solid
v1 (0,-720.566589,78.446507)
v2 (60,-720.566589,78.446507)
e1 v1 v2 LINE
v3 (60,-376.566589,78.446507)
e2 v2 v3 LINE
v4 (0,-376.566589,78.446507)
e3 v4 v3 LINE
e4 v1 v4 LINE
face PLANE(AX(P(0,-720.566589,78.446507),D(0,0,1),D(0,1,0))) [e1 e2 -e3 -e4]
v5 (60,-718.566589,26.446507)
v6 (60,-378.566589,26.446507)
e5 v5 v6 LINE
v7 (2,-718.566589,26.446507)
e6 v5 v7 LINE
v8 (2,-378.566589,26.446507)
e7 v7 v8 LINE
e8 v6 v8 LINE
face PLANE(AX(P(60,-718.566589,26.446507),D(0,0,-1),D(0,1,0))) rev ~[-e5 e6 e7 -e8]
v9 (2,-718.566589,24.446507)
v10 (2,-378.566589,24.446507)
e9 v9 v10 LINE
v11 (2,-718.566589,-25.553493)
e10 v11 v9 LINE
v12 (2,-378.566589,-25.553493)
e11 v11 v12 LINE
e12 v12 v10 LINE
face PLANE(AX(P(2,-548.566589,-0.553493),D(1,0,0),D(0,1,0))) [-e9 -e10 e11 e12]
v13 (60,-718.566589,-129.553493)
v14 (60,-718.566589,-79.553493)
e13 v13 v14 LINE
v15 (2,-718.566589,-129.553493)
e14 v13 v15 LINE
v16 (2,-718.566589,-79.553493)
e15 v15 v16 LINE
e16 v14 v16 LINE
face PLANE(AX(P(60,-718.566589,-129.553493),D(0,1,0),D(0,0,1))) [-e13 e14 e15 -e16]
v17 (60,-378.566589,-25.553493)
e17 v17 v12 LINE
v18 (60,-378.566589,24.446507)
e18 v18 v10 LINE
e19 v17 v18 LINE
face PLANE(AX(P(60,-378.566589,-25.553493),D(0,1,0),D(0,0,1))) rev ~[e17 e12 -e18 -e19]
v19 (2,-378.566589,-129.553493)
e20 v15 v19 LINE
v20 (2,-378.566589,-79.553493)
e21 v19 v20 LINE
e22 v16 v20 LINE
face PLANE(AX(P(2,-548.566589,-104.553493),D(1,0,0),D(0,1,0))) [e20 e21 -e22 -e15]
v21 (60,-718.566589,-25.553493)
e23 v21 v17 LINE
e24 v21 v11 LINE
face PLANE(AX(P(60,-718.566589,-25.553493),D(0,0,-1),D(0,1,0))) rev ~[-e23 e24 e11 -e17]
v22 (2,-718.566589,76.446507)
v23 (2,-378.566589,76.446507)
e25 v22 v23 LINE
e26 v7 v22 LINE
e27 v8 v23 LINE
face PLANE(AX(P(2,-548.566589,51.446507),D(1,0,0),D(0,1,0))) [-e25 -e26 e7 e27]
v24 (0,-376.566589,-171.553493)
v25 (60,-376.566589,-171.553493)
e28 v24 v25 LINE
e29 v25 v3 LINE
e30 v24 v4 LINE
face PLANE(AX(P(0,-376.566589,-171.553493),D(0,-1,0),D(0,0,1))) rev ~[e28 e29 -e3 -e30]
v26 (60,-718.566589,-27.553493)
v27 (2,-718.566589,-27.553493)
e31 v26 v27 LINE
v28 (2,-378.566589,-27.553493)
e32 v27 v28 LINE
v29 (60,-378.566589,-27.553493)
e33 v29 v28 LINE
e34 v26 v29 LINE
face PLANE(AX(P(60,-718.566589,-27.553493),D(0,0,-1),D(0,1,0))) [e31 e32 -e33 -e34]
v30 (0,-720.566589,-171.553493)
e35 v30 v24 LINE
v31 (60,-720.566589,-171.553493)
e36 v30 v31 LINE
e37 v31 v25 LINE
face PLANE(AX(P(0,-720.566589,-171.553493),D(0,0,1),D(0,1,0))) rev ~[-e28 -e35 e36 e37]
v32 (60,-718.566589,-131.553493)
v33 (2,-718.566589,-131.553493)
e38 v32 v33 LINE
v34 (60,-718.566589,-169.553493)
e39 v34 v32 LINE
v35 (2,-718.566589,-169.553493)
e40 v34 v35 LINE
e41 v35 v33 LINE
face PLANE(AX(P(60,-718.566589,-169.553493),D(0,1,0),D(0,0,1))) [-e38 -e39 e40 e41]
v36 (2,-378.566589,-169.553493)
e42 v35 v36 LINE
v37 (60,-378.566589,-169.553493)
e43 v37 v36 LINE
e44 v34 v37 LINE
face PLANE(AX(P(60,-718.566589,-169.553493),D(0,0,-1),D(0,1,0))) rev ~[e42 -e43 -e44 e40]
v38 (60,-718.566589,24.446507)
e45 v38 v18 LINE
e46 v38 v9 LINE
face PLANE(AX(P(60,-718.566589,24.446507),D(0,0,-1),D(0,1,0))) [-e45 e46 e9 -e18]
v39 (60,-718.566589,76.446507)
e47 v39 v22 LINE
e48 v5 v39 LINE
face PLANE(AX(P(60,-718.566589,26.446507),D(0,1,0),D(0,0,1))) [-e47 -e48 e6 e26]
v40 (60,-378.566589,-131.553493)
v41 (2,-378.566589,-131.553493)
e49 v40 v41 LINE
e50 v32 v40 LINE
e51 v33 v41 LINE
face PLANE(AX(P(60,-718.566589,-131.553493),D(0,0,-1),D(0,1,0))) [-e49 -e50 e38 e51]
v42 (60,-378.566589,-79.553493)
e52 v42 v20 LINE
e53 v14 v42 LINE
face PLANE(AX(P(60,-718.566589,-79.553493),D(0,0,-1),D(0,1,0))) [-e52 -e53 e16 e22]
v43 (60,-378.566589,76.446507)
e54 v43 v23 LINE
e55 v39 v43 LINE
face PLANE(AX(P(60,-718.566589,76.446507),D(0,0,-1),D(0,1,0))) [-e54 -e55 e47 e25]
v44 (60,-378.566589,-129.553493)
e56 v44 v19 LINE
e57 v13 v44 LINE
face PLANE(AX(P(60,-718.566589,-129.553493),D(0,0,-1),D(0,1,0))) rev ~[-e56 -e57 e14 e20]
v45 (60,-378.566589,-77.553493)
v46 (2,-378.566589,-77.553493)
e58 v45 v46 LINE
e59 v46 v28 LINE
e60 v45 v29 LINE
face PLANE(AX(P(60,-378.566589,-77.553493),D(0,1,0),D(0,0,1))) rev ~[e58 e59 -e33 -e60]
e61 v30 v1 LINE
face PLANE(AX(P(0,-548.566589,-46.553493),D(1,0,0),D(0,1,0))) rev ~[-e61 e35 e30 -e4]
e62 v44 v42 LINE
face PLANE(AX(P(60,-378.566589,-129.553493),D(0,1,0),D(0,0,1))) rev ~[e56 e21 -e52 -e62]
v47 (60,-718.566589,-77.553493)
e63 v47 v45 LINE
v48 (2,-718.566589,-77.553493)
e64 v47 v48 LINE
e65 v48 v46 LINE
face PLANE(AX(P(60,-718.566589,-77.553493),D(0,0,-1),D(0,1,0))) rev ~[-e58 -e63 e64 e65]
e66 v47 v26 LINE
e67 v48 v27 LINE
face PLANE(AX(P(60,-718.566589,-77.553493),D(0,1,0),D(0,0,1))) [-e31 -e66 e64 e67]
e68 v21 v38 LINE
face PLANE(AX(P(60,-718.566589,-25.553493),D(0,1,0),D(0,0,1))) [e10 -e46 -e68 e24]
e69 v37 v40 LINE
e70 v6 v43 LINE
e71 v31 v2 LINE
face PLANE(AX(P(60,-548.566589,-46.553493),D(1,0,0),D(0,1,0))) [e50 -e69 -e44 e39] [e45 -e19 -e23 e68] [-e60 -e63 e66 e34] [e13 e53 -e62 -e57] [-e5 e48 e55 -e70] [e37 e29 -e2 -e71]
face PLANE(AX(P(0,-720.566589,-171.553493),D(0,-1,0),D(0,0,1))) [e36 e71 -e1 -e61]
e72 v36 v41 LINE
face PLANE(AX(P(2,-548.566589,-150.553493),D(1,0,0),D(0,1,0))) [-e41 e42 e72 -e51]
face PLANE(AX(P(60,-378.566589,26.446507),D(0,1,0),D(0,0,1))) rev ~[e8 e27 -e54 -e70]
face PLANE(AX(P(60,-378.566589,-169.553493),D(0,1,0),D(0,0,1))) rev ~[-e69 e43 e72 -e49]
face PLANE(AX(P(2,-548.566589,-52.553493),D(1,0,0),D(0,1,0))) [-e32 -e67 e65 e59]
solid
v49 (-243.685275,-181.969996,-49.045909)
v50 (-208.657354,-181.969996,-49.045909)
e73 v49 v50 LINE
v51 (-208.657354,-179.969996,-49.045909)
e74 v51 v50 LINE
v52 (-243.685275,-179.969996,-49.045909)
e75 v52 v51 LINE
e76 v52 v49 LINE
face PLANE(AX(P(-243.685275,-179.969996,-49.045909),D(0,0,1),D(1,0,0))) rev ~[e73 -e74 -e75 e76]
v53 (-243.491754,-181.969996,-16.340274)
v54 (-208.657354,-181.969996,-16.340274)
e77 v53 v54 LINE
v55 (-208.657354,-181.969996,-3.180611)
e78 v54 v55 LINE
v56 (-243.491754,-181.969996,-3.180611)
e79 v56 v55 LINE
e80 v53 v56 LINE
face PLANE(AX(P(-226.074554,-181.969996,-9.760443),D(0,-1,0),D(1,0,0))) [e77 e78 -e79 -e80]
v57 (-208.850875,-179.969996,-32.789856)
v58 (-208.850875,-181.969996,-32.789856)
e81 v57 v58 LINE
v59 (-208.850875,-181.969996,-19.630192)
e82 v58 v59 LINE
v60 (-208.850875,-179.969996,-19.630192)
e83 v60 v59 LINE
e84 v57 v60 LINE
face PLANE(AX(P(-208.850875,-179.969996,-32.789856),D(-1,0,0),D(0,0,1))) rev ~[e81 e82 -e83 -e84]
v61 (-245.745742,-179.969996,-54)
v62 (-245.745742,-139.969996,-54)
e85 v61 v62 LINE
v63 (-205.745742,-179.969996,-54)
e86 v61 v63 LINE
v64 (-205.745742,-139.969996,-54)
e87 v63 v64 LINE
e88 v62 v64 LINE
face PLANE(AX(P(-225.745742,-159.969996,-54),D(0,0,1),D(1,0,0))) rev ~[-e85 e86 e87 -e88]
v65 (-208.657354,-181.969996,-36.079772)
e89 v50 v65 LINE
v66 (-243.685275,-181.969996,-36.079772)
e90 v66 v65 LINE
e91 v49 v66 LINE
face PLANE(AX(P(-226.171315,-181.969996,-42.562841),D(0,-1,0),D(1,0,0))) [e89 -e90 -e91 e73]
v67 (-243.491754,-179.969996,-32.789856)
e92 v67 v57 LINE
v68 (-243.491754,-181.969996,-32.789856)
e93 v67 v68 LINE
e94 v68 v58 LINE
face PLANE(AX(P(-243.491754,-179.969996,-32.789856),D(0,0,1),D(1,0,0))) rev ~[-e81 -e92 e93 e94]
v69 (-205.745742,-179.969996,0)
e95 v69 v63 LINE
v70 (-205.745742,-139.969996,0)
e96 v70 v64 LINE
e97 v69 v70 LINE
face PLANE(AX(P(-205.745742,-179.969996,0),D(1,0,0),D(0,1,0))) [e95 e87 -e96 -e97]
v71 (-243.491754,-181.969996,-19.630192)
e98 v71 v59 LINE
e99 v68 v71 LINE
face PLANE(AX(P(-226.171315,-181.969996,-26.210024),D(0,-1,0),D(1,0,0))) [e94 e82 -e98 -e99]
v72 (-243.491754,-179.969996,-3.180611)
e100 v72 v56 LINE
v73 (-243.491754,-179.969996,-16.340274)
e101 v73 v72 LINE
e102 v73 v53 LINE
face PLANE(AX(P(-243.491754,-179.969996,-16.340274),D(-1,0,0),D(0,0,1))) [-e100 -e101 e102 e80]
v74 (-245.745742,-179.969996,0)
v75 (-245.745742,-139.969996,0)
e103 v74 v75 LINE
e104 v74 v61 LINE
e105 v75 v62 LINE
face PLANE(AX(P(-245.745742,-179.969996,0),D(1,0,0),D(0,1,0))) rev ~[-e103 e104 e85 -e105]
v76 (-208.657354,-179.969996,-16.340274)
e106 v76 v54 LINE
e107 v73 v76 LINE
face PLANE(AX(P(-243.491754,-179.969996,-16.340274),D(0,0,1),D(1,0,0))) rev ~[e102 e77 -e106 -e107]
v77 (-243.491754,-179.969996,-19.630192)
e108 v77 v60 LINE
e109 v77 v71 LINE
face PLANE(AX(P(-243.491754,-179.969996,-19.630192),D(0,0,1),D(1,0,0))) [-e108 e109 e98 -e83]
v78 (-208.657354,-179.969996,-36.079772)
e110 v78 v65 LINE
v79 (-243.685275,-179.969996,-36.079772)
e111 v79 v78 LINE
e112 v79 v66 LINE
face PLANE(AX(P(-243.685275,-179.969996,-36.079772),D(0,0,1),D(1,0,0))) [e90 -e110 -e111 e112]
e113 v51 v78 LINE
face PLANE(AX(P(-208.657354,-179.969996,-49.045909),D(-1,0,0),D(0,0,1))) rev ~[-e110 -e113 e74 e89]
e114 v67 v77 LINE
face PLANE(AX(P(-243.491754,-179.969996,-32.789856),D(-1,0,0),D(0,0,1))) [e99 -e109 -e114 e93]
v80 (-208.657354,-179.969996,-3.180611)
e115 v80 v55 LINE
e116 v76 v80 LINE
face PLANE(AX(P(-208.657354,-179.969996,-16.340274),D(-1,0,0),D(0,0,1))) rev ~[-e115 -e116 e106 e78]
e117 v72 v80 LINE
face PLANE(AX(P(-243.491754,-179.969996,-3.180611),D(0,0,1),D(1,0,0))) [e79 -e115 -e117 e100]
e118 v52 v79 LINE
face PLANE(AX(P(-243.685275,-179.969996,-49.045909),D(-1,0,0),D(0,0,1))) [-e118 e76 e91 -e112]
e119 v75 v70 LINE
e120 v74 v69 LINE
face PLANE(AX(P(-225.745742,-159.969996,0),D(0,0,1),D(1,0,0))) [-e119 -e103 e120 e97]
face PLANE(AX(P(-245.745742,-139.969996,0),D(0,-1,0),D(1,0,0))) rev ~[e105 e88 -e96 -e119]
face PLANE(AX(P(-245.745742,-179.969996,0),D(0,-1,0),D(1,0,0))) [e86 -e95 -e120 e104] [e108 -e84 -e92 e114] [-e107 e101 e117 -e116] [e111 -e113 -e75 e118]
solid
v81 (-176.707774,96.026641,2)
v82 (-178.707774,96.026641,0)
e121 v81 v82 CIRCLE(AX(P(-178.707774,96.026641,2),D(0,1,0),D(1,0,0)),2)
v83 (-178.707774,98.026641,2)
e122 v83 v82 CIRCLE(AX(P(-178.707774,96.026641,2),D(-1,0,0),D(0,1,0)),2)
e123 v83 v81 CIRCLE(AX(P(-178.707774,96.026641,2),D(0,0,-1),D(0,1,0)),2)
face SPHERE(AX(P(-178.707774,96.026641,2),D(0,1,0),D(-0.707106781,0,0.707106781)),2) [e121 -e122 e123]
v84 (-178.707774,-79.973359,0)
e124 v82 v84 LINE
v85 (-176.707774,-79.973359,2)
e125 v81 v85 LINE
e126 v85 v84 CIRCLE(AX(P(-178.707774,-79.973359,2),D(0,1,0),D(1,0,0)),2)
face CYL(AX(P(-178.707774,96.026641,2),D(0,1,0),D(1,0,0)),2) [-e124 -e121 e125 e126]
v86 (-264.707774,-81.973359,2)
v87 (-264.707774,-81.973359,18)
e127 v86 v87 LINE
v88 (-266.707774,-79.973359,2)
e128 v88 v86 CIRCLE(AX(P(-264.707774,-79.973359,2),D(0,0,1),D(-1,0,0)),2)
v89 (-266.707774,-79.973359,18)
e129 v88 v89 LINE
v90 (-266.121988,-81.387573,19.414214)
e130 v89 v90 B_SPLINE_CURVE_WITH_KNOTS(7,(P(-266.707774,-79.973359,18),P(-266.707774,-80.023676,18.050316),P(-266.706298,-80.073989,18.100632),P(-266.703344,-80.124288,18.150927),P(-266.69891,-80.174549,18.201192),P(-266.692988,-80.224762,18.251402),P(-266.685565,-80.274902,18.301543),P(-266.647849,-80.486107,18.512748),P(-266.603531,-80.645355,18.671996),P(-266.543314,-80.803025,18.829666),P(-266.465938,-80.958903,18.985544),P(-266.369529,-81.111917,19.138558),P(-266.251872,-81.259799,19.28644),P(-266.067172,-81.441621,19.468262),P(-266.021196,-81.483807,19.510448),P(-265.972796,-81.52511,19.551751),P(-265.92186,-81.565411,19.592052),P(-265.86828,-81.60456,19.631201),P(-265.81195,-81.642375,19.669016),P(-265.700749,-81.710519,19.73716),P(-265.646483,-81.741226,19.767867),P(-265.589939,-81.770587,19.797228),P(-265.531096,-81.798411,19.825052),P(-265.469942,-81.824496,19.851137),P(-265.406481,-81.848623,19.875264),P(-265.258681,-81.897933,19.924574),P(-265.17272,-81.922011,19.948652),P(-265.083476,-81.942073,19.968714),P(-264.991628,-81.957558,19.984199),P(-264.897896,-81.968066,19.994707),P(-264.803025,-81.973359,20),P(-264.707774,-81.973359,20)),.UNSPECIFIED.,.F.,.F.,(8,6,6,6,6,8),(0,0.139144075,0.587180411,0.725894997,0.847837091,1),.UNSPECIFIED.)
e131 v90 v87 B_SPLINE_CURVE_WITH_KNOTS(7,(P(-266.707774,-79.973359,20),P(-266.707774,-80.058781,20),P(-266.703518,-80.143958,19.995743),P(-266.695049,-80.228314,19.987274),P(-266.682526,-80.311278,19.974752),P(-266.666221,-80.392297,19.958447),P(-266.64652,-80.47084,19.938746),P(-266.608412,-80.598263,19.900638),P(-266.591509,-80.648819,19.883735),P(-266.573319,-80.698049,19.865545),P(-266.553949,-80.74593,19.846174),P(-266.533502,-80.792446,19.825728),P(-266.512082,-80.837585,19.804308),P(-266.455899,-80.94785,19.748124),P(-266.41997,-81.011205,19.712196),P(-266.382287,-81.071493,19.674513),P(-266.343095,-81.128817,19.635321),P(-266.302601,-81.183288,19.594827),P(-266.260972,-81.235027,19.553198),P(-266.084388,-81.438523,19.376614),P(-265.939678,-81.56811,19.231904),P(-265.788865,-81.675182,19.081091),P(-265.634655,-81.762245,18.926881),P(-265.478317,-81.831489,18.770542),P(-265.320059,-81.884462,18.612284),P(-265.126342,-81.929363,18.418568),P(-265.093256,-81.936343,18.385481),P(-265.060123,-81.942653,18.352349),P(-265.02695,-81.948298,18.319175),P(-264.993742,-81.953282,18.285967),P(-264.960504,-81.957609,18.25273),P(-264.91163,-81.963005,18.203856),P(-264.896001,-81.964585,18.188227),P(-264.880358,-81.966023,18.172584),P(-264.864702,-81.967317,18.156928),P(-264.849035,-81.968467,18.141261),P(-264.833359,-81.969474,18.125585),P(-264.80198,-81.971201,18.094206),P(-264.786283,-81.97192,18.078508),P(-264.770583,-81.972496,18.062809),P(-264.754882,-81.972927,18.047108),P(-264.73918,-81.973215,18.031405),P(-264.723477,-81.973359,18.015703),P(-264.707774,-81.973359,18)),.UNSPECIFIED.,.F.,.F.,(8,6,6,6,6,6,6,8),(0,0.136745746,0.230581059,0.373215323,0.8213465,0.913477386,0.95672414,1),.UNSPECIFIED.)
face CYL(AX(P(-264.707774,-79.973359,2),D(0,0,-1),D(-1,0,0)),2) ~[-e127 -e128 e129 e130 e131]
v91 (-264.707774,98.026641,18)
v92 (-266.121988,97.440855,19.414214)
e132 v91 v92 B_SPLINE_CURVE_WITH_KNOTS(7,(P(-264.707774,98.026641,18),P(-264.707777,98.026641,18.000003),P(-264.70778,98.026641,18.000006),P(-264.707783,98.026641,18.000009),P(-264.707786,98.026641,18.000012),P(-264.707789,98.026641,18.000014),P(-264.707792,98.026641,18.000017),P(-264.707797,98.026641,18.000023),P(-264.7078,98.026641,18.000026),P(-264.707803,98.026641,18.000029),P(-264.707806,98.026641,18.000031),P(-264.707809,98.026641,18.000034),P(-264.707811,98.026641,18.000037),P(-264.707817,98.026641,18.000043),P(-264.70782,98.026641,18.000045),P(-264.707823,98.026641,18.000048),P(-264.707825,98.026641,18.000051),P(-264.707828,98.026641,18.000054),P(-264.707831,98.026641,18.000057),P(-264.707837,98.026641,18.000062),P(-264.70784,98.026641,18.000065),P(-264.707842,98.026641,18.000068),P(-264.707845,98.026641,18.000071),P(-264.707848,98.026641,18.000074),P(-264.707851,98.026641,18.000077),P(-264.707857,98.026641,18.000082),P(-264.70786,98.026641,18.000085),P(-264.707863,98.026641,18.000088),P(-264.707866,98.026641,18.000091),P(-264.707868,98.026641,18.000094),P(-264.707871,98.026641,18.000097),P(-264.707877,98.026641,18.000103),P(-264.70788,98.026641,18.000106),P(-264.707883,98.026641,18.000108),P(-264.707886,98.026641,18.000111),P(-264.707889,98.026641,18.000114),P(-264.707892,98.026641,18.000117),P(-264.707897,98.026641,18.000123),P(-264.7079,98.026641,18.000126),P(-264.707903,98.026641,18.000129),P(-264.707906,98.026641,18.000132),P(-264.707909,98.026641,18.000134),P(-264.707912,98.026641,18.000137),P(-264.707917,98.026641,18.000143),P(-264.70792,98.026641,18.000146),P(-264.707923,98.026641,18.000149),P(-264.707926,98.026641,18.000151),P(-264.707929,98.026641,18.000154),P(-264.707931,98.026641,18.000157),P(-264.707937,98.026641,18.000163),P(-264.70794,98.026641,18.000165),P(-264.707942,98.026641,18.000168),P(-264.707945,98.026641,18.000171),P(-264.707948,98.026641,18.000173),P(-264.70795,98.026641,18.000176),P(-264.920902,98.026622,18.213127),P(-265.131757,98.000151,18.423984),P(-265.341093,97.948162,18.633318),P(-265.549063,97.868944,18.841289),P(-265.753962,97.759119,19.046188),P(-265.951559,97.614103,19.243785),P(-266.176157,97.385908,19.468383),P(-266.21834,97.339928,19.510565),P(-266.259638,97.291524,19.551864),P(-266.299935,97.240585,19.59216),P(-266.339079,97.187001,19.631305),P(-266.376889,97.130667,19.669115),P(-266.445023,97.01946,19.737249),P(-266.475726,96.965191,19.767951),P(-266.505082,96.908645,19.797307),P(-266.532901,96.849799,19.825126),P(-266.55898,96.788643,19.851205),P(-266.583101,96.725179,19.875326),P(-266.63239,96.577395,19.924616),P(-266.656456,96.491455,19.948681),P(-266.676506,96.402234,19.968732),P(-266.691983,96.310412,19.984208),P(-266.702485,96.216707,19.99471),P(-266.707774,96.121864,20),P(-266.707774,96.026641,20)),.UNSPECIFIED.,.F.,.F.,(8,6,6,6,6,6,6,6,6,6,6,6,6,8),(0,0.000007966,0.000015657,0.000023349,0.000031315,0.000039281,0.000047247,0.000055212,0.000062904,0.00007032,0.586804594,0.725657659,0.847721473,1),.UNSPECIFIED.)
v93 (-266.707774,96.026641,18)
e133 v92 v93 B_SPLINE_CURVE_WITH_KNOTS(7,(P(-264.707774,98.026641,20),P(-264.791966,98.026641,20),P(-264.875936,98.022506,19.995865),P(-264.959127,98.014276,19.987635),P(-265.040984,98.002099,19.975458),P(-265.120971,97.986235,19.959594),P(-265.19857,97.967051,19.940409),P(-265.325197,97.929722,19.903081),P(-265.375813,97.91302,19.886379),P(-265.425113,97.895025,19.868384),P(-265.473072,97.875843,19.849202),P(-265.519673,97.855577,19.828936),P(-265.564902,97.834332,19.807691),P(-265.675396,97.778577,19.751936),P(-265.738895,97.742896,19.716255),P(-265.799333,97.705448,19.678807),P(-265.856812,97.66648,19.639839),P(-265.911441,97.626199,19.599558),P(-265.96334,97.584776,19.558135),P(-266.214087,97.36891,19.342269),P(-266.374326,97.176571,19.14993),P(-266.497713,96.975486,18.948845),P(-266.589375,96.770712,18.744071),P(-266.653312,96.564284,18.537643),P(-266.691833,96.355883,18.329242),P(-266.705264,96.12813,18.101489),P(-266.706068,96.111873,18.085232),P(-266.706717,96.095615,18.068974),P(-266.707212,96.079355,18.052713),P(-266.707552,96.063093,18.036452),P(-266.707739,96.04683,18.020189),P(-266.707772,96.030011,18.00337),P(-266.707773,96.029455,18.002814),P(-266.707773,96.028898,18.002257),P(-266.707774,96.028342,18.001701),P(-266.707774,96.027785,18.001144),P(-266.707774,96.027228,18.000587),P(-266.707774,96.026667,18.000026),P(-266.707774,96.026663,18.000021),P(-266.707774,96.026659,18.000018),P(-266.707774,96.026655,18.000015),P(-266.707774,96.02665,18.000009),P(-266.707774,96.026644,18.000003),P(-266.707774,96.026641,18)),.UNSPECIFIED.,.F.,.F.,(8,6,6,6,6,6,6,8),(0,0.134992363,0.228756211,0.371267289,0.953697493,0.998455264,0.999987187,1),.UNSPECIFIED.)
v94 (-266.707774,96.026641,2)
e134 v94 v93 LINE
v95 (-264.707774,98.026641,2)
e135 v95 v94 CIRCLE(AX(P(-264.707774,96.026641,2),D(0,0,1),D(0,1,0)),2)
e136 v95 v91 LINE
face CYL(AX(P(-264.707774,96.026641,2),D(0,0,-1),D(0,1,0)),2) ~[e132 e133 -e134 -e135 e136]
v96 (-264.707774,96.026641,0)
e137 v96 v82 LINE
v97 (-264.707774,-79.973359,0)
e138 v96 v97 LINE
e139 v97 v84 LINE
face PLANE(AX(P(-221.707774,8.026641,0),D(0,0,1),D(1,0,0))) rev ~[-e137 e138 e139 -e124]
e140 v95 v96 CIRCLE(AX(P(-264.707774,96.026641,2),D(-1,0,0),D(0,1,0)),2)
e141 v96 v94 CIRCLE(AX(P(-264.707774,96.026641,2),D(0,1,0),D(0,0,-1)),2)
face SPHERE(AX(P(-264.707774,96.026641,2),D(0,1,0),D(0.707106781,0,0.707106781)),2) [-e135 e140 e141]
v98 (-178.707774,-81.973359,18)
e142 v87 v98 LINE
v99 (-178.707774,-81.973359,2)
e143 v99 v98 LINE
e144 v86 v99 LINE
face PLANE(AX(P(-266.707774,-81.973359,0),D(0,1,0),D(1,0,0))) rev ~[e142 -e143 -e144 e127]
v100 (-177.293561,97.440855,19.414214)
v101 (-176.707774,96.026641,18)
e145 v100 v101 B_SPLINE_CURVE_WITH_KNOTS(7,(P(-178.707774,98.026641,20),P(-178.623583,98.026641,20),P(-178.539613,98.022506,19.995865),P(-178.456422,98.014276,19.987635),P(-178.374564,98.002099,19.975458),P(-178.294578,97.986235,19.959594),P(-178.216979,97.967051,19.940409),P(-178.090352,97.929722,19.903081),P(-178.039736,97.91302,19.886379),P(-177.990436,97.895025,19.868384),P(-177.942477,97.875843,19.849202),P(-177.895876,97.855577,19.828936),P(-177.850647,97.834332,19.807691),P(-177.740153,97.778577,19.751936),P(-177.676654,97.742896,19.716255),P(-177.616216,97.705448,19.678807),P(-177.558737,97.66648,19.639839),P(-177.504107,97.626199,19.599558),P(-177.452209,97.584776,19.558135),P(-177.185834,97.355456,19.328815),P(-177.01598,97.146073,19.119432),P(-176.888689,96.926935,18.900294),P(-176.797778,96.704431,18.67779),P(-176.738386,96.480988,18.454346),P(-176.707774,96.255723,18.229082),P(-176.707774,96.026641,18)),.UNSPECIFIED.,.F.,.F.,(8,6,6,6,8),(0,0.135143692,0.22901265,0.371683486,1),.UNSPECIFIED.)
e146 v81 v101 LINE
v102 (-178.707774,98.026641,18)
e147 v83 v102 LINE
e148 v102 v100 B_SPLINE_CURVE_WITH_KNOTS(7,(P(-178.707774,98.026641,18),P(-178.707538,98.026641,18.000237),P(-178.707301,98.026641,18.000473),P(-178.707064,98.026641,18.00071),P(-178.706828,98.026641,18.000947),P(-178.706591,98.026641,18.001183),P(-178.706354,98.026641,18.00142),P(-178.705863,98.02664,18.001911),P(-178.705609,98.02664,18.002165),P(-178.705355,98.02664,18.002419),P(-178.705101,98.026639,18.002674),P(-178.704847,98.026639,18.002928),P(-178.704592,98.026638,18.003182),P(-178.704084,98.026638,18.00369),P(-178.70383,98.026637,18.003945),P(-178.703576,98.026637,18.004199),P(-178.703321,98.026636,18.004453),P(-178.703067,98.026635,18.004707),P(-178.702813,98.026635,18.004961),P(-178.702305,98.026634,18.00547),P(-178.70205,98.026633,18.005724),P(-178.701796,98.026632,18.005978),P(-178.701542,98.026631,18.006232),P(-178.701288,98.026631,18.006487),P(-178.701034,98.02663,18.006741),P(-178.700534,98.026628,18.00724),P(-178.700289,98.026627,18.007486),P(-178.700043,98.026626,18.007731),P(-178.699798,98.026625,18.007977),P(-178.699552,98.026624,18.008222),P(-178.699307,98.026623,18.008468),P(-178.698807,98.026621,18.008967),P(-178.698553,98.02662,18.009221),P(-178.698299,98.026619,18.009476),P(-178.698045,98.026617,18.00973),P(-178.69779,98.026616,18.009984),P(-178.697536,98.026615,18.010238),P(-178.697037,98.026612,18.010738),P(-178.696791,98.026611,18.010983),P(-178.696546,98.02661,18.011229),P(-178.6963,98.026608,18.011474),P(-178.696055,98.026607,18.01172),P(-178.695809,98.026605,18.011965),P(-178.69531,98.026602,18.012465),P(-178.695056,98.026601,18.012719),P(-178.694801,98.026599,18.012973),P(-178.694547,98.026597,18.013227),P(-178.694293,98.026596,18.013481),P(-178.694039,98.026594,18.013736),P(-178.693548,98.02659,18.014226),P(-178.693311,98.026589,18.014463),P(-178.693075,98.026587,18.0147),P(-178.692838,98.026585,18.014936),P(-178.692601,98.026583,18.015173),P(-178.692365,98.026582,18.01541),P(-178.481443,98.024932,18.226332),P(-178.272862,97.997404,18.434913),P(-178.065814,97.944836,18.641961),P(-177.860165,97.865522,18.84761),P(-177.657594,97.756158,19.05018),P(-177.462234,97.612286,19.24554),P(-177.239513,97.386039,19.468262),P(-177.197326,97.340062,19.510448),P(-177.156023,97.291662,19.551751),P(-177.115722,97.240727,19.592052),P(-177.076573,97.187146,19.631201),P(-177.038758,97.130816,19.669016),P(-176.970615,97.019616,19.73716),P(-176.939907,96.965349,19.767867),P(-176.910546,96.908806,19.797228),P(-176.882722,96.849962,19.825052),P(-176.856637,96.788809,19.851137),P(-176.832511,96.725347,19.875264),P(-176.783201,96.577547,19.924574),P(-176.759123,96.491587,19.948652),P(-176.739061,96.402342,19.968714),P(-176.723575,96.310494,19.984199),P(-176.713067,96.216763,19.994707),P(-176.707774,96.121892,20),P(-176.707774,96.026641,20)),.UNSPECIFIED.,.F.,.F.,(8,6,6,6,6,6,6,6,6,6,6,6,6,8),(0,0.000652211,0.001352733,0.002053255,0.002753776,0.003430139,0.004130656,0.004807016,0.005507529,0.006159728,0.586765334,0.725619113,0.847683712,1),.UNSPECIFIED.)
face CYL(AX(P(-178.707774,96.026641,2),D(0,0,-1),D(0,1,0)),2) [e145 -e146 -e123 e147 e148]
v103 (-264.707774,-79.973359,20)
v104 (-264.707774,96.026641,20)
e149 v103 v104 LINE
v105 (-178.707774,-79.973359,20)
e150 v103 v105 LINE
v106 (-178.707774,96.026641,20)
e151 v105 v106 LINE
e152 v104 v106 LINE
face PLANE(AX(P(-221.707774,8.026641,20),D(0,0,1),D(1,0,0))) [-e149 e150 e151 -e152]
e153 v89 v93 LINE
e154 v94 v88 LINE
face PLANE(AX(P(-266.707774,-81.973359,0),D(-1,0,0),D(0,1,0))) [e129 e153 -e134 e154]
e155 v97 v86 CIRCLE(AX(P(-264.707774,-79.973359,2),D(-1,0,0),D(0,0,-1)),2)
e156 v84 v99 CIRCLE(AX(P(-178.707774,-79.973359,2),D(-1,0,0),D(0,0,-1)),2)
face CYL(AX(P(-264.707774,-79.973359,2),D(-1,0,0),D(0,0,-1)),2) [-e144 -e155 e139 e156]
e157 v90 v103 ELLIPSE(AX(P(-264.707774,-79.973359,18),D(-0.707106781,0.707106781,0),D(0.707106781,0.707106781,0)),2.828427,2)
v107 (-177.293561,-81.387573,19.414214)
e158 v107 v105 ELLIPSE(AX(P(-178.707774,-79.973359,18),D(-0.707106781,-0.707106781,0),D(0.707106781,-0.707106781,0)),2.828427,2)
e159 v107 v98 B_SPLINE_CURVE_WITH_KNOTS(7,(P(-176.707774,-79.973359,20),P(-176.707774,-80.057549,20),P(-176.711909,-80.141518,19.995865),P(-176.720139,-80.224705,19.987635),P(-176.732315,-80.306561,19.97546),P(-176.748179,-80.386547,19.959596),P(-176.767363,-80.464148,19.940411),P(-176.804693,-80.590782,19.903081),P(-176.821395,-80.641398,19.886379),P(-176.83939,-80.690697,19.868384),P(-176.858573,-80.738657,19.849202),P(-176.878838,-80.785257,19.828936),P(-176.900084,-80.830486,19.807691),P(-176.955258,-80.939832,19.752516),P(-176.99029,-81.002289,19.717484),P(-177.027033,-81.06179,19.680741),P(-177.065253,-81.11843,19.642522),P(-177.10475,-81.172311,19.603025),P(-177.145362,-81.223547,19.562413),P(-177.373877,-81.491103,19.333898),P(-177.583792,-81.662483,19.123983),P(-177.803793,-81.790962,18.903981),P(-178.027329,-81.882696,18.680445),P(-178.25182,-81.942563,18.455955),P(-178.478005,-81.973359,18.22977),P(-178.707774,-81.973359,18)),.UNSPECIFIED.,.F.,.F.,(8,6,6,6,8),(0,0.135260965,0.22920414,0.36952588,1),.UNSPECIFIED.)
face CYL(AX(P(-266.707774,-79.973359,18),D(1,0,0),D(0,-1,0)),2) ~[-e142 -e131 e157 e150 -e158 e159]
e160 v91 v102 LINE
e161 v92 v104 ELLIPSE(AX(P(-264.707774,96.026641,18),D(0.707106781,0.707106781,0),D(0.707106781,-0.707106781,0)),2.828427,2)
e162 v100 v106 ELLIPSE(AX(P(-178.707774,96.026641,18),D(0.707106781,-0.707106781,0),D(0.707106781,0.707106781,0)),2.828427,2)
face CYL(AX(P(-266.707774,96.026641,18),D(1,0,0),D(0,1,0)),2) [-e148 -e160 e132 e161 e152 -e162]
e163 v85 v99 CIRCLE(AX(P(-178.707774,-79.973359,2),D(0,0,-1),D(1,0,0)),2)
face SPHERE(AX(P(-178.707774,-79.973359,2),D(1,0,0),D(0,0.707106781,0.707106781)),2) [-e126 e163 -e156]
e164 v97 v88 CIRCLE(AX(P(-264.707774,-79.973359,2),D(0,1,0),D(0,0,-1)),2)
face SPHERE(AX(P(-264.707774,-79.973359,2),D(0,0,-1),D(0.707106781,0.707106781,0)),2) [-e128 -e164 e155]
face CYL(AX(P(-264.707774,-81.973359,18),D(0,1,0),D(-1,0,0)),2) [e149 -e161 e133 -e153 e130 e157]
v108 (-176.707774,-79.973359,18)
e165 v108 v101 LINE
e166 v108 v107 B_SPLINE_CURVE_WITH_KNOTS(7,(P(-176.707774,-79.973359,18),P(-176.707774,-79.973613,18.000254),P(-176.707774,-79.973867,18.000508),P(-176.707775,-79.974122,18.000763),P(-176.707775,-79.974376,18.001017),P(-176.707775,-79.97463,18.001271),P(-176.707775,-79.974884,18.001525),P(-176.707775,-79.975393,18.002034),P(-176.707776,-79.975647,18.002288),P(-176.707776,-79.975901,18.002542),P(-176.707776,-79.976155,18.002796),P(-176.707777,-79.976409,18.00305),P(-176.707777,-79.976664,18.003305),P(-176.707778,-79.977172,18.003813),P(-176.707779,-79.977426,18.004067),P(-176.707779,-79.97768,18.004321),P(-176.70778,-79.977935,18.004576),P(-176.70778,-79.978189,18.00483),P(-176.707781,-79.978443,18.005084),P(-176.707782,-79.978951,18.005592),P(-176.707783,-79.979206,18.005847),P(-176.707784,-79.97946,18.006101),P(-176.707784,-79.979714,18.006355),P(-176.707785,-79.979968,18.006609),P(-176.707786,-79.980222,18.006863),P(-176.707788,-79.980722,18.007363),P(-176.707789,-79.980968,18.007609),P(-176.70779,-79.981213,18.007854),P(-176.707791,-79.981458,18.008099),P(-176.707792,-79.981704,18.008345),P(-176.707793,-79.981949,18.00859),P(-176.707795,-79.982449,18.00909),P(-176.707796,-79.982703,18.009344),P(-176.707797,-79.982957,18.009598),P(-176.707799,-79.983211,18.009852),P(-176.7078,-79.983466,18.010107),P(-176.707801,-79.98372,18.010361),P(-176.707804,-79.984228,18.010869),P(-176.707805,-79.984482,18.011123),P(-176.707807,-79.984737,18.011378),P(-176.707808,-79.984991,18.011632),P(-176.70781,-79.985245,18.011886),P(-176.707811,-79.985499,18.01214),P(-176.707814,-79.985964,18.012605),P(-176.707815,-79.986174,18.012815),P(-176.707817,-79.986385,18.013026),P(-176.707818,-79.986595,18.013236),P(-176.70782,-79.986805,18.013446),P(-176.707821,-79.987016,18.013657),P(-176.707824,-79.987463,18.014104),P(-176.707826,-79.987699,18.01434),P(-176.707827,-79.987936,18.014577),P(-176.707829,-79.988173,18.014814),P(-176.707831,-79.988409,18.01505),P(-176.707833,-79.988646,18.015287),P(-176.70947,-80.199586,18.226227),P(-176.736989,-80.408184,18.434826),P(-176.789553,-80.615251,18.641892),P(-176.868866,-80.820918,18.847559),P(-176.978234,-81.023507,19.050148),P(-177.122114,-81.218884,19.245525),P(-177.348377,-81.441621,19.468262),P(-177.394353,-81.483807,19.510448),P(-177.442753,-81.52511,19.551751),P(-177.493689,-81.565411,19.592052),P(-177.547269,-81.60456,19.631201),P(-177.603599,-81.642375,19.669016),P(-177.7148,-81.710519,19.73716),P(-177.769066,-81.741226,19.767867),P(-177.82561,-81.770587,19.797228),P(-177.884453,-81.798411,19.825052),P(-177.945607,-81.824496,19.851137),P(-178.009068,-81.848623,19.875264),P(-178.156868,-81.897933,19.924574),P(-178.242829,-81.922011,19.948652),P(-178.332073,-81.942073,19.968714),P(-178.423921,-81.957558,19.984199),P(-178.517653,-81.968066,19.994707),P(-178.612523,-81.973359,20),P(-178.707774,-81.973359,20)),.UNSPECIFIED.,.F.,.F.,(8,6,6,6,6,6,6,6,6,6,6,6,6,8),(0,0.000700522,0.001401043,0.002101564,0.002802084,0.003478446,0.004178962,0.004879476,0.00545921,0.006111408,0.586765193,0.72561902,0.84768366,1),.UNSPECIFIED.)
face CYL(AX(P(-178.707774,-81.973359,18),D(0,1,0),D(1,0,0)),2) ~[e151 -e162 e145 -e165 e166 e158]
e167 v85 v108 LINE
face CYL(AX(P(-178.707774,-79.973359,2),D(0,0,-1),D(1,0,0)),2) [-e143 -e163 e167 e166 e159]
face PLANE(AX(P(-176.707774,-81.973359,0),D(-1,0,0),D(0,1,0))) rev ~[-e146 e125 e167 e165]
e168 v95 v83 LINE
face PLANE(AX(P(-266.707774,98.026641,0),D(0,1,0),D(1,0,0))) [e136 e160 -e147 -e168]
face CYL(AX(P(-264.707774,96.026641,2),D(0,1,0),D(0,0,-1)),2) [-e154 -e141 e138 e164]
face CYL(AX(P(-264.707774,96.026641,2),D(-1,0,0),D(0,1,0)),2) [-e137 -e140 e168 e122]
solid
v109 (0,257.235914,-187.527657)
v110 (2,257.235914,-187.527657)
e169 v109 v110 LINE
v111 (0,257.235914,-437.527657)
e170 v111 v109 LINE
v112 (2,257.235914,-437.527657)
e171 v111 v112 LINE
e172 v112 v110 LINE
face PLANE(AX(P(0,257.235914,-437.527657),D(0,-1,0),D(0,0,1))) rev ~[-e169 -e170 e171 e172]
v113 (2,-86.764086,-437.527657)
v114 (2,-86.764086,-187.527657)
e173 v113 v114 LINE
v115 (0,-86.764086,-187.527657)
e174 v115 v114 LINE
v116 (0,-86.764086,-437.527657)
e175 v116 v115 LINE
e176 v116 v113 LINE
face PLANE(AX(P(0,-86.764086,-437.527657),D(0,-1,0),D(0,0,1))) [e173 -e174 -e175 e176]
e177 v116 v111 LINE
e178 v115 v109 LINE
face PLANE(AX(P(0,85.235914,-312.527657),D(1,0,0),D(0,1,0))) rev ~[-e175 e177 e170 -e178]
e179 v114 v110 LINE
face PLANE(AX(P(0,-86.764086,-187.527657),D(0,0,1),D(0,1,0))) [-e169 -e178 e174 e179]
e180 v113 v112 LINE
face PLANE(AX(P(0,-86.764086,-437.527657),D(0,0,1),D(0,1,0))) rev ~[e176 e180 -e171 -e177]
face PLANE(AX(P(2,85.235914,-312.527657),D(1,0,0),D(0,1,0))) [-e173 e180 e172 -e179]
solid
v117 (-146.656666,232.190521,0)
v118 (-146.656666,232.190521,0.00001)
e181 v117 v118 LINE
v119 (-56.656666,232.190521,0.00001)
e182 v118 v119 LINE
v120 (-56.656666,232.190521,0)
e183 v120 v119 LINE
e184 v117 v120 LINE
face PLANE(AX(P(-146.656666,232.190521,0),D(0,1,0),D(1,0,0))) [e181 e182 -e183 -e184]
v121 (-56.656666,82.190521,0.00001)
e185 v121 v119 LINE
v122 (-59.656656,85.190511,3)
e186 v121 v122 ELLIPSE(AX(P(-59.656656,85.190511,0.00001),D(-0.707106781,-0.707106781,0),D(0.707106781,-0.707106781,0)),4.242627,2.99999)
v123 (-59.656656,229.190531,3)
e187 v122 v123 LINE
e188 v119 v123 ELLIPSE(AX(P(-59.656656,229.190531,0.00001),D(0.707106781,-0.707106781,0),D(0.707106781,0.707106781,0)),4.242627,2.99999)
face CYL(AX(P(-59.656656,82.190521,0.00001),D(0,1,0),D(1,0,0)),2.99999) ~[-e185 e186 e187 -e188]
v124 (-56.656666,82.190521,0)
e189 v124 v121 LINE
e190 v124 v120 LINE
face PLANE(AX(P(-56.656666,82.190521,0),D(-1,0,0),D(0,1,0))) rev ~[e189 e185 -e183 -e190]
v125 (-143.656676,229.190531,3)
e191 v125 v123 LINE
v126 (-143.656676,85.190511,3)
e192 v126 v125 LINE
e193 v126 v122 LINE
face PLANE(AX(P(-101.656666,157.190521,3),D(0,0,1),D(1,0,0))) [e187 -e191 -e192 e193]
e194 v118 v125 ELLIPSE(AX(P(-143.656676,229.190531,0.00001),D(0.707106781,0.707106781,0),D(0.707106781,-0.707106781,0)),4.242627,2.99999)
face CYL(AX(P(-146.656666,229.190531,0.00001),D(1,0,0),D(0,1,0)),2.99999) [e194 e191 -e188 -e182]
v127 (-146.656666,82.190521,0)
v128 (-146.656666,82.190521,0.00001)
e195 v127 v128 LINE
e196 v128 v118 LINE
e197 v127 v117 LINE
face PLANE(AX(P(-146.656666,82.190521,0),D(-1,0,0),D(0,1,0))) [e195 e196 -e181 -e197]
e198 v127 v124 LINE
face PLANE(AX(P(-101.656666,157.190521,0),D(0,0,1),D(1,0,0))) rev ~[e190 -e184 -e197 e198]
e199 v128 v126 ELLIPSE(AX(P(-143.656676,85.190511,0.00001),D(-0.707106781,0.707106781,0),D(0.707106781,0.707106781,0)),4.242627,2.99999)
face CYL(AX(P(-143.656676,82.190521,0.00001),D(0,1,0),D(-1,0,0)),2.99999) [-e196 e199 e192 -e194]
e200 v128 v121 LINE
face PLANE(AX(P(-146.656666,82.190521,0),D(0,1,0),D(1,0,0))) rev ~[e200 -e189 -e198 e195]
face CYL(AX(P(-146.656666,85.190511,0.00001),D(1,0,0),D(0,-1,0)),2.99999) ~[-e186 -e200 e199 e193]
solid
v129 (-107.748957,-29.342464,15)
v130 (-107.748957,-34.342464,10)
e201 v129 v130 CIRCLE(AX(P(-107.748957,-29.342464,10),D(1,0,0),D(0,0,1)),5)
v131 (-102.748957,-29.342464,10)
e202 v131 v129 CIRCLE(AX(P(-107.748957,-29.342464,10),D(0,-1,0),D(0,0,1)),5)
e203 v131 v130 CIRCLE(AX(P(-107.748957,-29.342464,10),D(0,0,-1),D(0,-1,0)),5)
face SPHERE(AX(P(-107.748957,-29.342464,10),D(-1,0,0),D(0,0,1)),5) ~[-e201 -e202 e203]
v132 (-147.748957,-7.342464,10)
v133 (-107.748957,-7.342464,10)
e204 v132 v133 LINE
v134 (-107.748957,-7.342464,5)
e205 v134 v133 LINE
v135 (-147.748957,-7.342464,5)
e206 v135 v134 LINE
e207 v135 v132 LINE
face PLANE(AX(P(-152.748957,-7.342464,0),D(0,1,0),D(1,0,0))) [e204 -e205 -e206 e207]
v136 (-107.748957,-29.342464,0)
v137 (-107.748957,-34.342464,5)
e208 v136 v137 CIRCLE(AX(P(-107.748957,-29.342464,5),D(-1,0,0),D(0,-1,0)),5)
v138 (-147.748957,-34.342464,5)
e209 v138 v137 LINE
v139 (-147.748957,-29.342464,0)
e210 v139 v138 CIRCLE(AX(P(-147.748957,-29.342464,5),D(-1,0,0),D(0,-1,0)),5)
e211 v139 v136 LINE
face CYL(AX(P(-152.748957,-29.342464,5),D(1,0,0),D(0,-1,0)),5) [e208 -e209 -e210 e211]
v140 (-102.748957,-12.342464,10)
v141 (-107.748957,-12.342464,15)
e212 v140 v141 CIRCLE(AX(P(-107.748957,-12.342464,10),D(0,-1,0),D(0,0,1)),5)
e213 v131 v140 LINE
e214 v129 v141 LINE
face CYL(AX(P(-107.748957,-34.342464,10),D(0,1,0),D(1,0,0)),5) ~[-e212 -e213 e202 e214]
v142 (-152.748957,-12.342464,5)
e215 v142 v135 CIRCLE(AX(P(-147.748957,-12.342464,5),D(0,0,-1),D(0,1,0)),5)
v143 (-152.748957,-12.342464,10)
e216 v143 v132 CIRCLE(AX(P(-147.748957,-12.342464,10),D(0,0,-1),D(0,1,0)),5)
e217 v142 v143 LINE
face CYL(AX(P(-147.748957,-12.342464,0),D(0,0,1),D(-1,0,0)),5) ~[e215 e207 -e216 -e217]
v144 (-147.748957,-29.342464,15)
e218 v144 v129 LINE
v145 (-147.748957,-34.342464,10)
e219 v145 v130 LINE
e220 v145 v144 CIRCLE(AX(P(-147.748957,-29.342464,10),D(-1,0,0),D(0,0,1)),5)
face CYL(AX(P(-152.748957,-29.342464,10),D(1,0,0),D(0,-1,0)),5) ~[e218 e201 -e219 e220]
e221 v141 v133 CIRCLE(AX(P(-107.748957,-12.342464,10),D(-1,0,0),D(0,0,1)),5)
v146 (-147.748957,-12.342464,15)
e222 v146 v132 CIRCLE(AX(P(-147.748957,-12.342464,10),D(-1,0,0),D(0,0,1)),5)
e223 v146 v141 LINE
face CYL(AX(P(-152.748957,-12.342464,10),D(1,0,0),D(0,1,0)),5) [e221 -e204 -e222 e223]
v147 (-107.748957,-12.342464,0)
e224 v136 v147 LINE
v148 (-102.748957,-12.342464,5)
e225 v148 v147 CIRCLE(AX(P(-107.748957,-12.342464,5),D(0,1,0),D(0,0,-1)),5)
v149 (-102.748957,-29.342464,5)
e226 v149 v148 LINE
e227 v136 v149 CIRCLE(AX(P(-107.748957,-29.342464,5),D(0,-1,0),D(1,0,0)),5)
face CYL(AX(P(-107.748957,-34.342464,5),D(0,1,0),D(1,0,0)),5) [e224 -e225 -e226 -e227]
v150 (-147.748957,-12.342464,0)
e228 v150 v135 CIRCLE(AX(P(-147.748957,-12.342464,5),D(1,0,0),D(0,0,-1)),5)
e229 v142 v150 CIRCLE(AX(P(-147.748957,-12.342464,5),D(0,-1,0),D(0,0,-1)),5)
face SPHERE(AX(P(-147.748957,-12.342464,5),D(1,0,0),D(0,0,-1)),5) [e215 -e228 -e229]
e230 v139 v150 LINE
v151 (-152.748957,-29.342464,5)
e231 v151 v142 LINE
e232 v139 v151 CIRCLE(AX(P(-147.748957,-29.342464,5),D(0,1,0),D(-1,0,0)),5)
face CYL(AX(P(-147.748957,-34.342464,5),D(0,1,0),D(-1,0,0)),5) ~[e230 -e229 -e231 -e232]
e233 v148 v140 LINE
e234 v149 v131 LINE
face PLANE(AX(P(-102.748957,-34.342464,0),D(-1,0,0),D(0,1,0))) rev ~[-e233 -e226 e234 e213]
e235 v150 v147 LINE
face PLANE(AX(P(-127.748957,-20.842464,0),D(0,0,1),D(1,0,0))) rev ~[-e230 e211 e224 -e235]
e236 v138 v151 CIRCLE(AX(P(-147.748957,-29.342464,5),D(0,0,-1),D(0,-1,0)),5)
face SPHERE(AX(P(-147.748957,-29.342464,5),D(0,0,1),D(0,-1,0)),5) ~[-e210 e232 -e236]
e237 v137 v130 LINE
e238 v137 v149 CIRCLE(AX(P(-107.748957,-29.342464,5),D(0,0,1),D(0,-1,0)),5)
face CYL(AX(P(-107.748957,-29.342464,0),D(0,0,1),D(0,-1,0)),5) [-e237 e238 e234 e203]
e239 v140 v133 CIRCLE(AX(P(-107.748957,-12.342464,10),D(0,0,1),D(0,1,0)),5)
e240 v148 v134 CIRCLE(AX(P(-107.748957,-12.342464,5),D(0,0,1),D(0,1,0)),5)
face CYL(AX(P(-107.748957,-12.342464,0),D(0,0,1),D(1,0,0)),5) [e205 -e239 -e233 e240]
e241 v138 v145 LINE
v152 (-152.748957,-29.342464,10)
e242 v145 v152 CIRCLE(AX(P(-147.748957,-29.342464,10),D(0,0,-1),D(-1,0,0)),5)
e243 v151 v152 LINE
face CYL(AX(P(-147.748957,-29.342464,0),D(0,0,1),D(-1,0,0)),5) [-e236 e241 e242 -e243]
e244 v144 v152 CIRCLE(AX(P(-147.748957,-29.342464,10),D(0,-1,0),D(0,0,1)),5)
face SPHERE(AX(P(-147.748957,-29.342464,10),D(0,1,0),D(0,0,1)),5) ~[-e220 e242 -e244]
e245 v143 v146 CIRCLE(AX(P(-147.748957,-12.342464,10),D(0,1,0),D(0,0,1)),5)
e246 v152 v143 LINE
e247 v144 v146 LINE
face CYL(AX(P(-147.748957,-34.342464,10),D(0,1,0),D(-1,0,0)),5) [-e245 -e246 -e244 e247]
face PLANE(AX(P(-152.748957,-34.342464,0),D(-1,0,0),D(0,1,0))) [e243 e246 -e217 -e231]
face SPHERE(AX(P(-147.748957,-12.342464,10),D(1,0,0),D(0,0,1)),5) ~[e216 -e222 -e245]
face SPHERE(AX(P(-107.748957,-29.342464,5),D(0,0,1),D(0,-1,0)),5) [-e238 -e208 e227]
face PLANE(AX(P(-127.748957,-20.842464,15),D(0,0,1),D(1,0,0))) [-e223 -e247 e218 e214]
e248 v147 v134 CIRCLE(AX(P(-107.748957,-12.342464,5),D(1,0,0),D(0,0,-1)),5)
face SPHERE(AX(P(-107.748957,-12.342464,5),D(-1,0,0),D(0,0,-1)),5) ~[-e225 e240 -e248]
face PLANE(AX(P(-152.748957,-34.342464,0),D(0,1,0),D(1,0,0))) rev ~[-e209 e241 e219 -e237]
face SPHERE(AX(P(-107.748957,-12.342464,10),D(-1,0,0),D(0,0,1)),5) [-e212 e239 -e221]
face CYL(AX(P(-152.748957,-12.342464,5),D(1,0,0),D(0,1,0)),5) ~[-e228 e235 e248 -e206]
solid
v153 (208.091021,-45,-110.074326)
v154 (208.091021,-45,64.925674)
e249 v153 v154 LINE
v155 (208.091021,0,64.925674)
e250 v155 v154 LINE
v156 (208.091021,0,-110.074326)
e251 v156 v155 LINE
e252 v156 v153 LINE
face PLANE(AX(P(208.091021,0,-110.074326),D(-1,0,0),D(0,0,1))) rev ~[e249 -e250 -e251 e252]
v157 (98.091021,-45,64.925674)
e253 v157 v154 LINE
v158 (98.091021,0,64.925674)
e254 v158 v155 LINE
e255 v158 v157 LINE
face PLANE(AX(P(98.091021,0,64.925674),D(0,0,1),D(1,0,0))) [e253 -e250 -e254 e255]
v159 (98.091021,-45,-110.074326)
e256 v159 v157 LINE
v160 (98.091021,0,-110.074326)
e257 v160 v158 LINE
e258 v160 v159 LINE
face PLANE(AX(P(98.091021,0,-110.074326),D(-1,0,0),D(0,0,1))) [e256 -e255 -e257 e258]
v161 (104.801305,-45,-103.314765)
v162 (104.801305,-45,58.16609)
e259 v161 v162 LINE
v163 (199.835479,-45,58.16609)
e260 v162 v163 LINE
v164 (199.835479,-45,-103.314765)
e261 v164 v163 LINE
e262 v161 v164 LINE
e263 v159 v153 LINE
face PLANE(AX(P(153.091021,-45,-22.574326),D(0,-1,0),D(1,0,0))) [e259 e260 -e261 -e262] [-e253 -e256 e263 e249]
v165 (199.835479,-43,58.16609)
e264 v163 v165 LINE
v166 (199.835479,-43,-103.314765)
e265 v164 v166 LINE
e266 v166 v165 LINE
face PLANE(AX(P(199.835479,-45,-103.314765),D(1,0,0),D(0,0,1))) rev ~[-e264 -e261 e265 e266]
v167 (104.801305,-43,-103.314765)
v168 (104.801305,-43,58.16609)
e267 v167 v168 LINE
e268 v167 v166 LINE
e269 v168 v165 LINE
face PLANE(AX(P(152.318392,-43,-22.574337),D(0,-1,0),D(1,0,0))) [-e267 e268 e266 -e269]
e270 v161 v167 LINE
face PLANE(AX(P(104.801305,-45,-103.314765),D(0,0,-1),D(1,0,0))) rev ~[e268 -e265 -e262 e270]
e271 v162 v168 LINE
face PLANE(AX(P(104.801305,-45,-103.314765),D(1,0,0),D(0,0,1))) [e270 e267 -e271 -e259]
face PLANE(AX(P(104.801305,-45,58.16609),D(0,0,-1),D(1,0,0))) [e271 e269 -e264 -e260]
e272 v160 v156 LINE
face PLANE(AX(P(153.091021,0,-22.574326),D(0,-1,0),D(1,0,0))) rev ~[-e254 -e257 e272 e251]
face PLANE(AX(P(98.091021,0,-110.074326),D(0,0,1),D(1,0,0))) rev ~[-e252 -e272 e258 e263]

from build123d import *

# Parameters (mm, degrees)
F0_W         = 90
F0_H         = 180
F1_DEPTH     = 20
F2_R         = 2
F3_T1_DEPTH  = 21
F3_T3_DEPTH  = 86
F3_T5_DEPTH  = 176
F3_S9_W      = 2.04
F3_S9_H      = 2.04
F3_T10_DEPTH = 2.04
F3_S15_W     = 2.04
F3_S15_H     = 2.04
F3_T16_DEPTH = 2.04
F3_S21_W     = 2.04
F3_S21_H     = 2.04
F3_T22_DEPTH = 2.04
F3_S27_W     = 2.04
F3_S27_H     = 2.04
F3_T28_DEPTH = 2.04
F4_W         = 90
F4_H         = 150
F5_DEPTH     = 3
F6_R         = 2.99999
F7_W         = 50
F7_H         = 27
F8_DEPTH     = 15
F9_R         = 5
F10_W        = 110
F10_H        = 175
F11_DEPTH    = 45
F12_W        = 95.0341746211
F12_H        = 161.4808551967
F13_DEPTH    = 2
F14_W        = 344
F14_H        = 250
F15_DEPTH    = 60
F16_W        = 340
F16_H        = 50
F16_H_2      = 38
F17_DEPTH    = 58
F18_W        = 344
F18_H        = 250
F19_DEPTH    = 2
F20_W        = 40
F20_H        = 40
F21_DEPTH    = 54
F22_W        = 34.8343998194
F22_H        = 13.1596634164
F22_W_2      = 34.6408784389
F22_H_2      = 13.1596643478
F22_W_3      = 35.0279211998
F22_H_3      = 12.9661373794
F23_DEPTH    = 2


# Not quite as in the source:
# - a fillet or chamfer that OpenCascade refuses, or shapes differently, is made with other operations: its cross-section is extruded or revolved along the edge and cut away or added
# - a fillet or chamfer is up to 0.001 mm smaller than in the source, because OpenCascade refuses the exact size


with BuildPart() as f1:
    # F0 (on Top) → F1 (new body)
    with BuildSketch(Plane.XY):
        with Locations((-221.7077744007, 8.0266410112)):
            Rectangle(F0_W, F0_H)
    extrude(amount=F1_DEPTH)

    # F2
    f2_edges = [f1.edges().sort_by_distance(p)[0] for p in [
        (-221.707774, 98.026641, 20),
        (-266.707774, 8.026641, 20),
        (-221.707774, -81.973359, 20),
        (-176.707774, 8.026641, 20),
    ]]
    fillet(f2_edges, radius=F2_R)

    # F3: fillet of radius 2 on 16 edges, made by hand

    # F3_s2 → F3_t1 (cut)
    with BuildSketch(Plane.XY.offset(2)):
        with BuildLine():
            ThreePointArc((-266.7077744007, -79.9733589888), (-266.1219879631, -81.3875725511), (-264.7077744007, -81.9733589888))
            Line((-264.7077744007, -81.9733589888), (-266.7077744007, -81.9733589888))
            Line((-266.7077744007, -81.9733589888), (-266.7077744007, -79.9733589888))
        make_face()
        with BuildLine():
            ThreePointArc((-176.7077744007, -79.9733589888), (-177.2935608383, -81.3875725511), (-178.7077744007, -81.9733589888))
            Line((-178.7077744007, -81.9733589888), (-176.7077744007, -81.9733589888))
            Line((-176.7077744007, -81.9733589888), (-176.7077744007, -79.9733589888))
        make_face()
        with BuildLine():
            ThreePointArc((-178.7077744007, 98.0266410112), (-177.2935608383, 97.4408545736), (-176.7077744007, 96.0266410112))
            Line((-176.7077744007, 96.0266410112), (-176.7077744007, 98.0266410112))
            Line((-176.7077744007, 98.0266410112), (-178.7077744007, 98.0266410112))
        make_face()
        with BuildLine():
            ThreePointArc((-264.7077744007, 98.0266410112), (-266.1219879631, 97.4408545736), (-266.7077744007, 96.0266410112))
            Line((-266.7077744007, 96.0266410112), (-266.7077744007, 98.0266410112))
            Line((-266.7077744007, 98.0266410112), (-264.7077744007, 98.0266410112))
        make_face()
    extrude(amount=F3_T1_DEPTH, mode=Mode.SUBTRACT)

    # F3_s4 → F3_t3 (cut)
    with BuildSketch(Plane.YZ.offset(-264.7077744007)):
        with BuildLine():
            ThreePointArc((-79.9733589888, 0), (-81.3875725511, 0.5857864376), (-81.9733589888, 2))
            Line((-81.9733589888, 2), (-81.9733589888, 0))
            Line((-81.9733589888, 0), (-79.9733589888, 0))
        make_face()
        with BuildLine():
            ThreePointArc((98.0266410112, 2), (97.4408545736, 0.5857864376), (96.0266410112, 0))
            Line((96.0266410112, 0), (98.0266410112, 0))
            Line((98.0266410112, 0), (98.0266410112, 2))
        make_face()
    extrude(amount=F3_T3_DEPTH, mode=Mode.SUBTRACT)

    # F3_s6 → F3_t5 (cut)
    with BuildSketch(Plane.XZ.offset(-96.0266410112)):
        with BuildLine():
            ThreePointArc((-176.7077744007, 2), (-177.2935608383, 0.5857864376), (-178.7077744007, 0))
            Line((-178.7077744007, 0), (-176.7077744007, 0))
            Line((-176.7077744007, 0), (-176.7077744007, 2))
        make_face()
        with BuildLine():
            ThreePointArc((-264.7077744007, 0), (-266.1219879631, 0.5857864376), (-266.7077744007, 2))
            Line((-266.7077744007, 2), (-266.7077744007, 0))
            Line((-266.7077744007, 0), (-264.7077744007, 0))
        make_face()
    extrude(amount=F3_T5_DEPTH, mode=Mode.SUBTRACT)


with BuildPart() as f3_tool8:
    # F3_s9 → F3_t10 (new body)
    with BuildSketch(Plane.XY.offset(2)):
        with Locations((-265.7277744007, -80.9933589888)):
            Rectangle(F3_S9_W, F3_S9_H)
    extrude(amount=-F3_T10_DEPTH)

    # F3_s11 → F3_t12 (revolve, cut)
    with BuildSketch(Plane(origin=(-264.7077744007, -79.9733589888, 2), x_dir=(0.7071067812, 0.7071067812, 0), z_dir=(-0.7071067812, 0.7071067812, 0))):
        with BuildLine():
            ThreePointArc((0, -2), (2, 0), (0, 2))
            Line((0, 2), (0, -2))
        make_face()
    revolve(axis=Axis((-264.7077744007, -79.9733589888, 2), (0, 0, -1)), mode=Mode.SUBTRACT)


with BuildPart() as f1_1:
    add(f1.part)

    # F3_t7: cut F3_tool8
    add(f3_tool8.part, mode=Mode.SUBTRACT)


with BuildPart() as f3_tool14:
    # F3_s15 → F3_t16 (new body)
    with BuildSketch(Plane.YZ.offset(-178.7077744007)):
        with Locations((-80.9933589888, 0.98)):
            Rectangle(F3_S15_W, F3_S15_H)
    extrude(amount=F3_T16_DEPTH)

    # F3_s17 → F3_t18 (revolve, cut)
    with BuildSketch(Plane(origin=(-178.7077744007, -79.9733589888, 2), x_dir=(0, 0.7071067812, 0.7071067812), z_dir=(0, 0.7071067812, -0.7071067812))):
        with BuildLine():
            ThreePointArc((0, -2), (2, 0), (0, 2))
            Line((0, 2), (0, -2))
        make_face()
    revolve(axis=Axis((-178.7077744007, -79.9733589888, 2), (1, 0, 0)), mode=Mode.SUBTRACT)


with BuildPart() as f1_2:
    add(f1_1.part)

    # F3_t13: cut F3_tool14
    add(f3_tool14.part, mode=Mode.SUBTRACT)


with BuildPart() as f3_tool20:
    # F3_s21 → F3_t22 (new body)
    with BuildSketch(Plane.XZ.offset(-96.0266410112)):
        with Locations((-177.6877744007, 0.98)):
            Rectangle(F3_S21_W, F3_S21_H)
    extrude(amount=-F3_T22_DEPTH)

    # F3_s23 → F3_t24 (revolve, cut)
    with BuildSketch(Plane(origin=(-178.7077744007, 96.0266410112, 2), x_dir=(-0.7071067812, 0, 0.7071067812), z_dir=(-0.7071067812, 0, -0.7071067812))):
        with BuildLine():
            ThreePointArc((0, -2), (2, 0), (0, 2))
            Line((0, 2), (0, -2))
        make_face()
    revolve(axis=Axis((-178.7077744007, 96.0266410112, 2), (0, 1, 0)), mode=Mode.SUBTRACT)


with BuildPart() as f1_3:
    add(f1_2.part)

    # F3_t19: cut F3_tool20
    add(f3_tool20.part, mode=Mode.SUBTRACT)


with BuildPart() as f3_tool26:
    # F3_s27 → F3_t28 (new body)
    with BuildSketch(Plane.XZ.offset(-96.0266410112)):
        with Locations((-265.7277744007, 0.98)):
            Rectangle(F3_S27_W, F3_S27_H)
    extrude(amount=-F3_T28_DEPTH)

    # F3_s29 → F3_t30 (revolve, cut)
    with BuildSketch(Plane(origin=(-264.7077744007, 96.0266410112, 2), x_dir=(0.7071067812, 0, 0.7071067812), z_dir=(-0.7071067812, 0, 0.7071067812))):
        with BuildLine():
            ThreePointArc((0, -2), (2, 0), (0, 2))
            Line((0, 2), (0, -2))
        make_face()
    revolve(axis=Axis((-264.7077744007, 96.0266410112, 2), (0, 1, 0)), mode=Mode.SUBTRACT)


with BuildPart() as f1_4:
    add(f1_3.part)

    # F3_t25: cut F3_tool26
    add(f3_tool26.part, mode=Mode.SUBTRACT)


with BuildPart() as f5:
    # F4 (on Top) → F5 (new body)
    with BuildSketch(Plane.XY):
        with Locations((-101.6566661, 157.1905210614)):
            Rectangle(F4_W, F4_H)
    extrude(amount=F5_DEPTH)

    # F6 (radius 3 in the source; OpenCascade refuses exactly that, so slightly less here)
    f6_edges = [f5.edges().sort_by_distance(p)[0] for p in [
        (-101.656666, 82.190521, 3),
        (-56.656666, 157.190521, 3),
        (-101.656666, 232.190521, 3),
        (-146.656666, 157.190521, 3),
    ]]
    fillet(f6_edges, radius=F6_R)


with BuildPart() as f8:
    # F7 (on Top) → F8 (new body)
    with BuildSketch(Plane.XY):
        with Locations((-127.7489569783, -20.8424640596)):
            Rectangle(F7_W, F7_H)
    extrude(amount=F8_DEPTH)

    # F9
    f9_edges = [f8.edges().sort_by_distance(p)[0] for p in [
        (-127.748957, -7.342464, 15),
        (-152.748957, -20.842464, 15),
        (-127.748957, -34.342464, 15),
        (-102.748957, -20.842464, 15),
        (-152.748957, -34.342464, 7.5),
        (-102.748957, -34.342464, 7.5),
        (-127.748957, -34.342464, 0),
        (-127.748957, -7.342464, 0),
        (-152.748957, -20.842464, 0),
        (-102.748957, -20.842464, 0),
        (-152.748957, -7.342464, 7.5),
        (-102.748957, -7.342464, 7.5),
    ]]
    fillet(f9_edges, radius=F9_R)


with BuildPart() as f11:
    # F10 (on Front) → F11 (new body)
    with BuildSketch(Plane.XZ):
        with Locations((153.0910205841, -22.574326396)):
            Rectangle(F10_W, F10_H)
    extrude(amount=F11_DEPTH)

    # F12 (on face) → F13 (cut)
    with BuildSketch(Plane.XZ.offset(45)):
        with Locations((152.3183919489, -22.5743371993)):
            Rectangle(F12_W, F12_H)
    extrude(amount=-F13_DEPTH, mode=Mode.SUBTRACT)


with BuildPart() as f15:
    # F14 (on Right) → F15 (new body)
    with BuildSketch(Plane.YZ):
        with Locations((-548.5665888786, -46.5534925461)):
            Rectangle(F14_W, F14_H)
    extrude(amount=F15_DEPTH)

    # F16 (on face) → F17 (cut)
    with BuildSketch(Plane.YZ.offset(60)):
        with Locations((-548.5665888786, 51.4465074539)):
            Rectangle(F16_W, F16_H)
        with Locations((-548.5665888786, -0.5534925461)):
            Rectangle(F16_W, F16_H)
        with Locations((-548.5665888786, -52.5534925461)):
            Rectangle(F16_W, F16_H)
        with Locations((-548.5665888786, -104.5534925461)):
            Rectangle(F16_W, F16_H)
        with Locations((-548.5665888786, -150.5534925461)):
            Rectangle(F16_W, F16_H_2)
    extrude(amount=-F17_DEPTH, mode=Mode.SUBTRACT)


with BuildPart() as f19:
    # F18 (on Right) → F19 (new body)
    with BuildSketch(Plane.YZ):
        with Locations((85.2359144688, -312.5276565552)):
            Rectangle(F18_W, F18_H)
    extrude(amount=F19_DEPTH)


with BuildPart() as f21:
    # F20 (on Top) → F21 (new body)
    with BuildSketch(Plane.XY):
        with Locations((-225.745741725, -159.9699962139)):
            Rectangle(F20_W, F20_H)
    extrude(amount=-F21_DEPTH)

    # F22 (on face) → F23 (join)
    with BuildSketch(Plane.XZ.offset(179.9699962139)):
        with Locations((-226.0745540261, -9.7604426555)):
            Rectangle(F22_W, F22_H)
        with Locations((-226.1713147163, -26.2100240216)):
            Rectangle(F22_W_2, F22_H_2)
        with Locations((-226.1713147163, -42.5628405064)):
            Rectangle(F22_W_3, F22_H_3)
    extrude(amount=F23_DEPTH)


solid = Compound([f1_4.part, f5.part, f8.part, f11.part, f15.part, f19.part, f21.part])
